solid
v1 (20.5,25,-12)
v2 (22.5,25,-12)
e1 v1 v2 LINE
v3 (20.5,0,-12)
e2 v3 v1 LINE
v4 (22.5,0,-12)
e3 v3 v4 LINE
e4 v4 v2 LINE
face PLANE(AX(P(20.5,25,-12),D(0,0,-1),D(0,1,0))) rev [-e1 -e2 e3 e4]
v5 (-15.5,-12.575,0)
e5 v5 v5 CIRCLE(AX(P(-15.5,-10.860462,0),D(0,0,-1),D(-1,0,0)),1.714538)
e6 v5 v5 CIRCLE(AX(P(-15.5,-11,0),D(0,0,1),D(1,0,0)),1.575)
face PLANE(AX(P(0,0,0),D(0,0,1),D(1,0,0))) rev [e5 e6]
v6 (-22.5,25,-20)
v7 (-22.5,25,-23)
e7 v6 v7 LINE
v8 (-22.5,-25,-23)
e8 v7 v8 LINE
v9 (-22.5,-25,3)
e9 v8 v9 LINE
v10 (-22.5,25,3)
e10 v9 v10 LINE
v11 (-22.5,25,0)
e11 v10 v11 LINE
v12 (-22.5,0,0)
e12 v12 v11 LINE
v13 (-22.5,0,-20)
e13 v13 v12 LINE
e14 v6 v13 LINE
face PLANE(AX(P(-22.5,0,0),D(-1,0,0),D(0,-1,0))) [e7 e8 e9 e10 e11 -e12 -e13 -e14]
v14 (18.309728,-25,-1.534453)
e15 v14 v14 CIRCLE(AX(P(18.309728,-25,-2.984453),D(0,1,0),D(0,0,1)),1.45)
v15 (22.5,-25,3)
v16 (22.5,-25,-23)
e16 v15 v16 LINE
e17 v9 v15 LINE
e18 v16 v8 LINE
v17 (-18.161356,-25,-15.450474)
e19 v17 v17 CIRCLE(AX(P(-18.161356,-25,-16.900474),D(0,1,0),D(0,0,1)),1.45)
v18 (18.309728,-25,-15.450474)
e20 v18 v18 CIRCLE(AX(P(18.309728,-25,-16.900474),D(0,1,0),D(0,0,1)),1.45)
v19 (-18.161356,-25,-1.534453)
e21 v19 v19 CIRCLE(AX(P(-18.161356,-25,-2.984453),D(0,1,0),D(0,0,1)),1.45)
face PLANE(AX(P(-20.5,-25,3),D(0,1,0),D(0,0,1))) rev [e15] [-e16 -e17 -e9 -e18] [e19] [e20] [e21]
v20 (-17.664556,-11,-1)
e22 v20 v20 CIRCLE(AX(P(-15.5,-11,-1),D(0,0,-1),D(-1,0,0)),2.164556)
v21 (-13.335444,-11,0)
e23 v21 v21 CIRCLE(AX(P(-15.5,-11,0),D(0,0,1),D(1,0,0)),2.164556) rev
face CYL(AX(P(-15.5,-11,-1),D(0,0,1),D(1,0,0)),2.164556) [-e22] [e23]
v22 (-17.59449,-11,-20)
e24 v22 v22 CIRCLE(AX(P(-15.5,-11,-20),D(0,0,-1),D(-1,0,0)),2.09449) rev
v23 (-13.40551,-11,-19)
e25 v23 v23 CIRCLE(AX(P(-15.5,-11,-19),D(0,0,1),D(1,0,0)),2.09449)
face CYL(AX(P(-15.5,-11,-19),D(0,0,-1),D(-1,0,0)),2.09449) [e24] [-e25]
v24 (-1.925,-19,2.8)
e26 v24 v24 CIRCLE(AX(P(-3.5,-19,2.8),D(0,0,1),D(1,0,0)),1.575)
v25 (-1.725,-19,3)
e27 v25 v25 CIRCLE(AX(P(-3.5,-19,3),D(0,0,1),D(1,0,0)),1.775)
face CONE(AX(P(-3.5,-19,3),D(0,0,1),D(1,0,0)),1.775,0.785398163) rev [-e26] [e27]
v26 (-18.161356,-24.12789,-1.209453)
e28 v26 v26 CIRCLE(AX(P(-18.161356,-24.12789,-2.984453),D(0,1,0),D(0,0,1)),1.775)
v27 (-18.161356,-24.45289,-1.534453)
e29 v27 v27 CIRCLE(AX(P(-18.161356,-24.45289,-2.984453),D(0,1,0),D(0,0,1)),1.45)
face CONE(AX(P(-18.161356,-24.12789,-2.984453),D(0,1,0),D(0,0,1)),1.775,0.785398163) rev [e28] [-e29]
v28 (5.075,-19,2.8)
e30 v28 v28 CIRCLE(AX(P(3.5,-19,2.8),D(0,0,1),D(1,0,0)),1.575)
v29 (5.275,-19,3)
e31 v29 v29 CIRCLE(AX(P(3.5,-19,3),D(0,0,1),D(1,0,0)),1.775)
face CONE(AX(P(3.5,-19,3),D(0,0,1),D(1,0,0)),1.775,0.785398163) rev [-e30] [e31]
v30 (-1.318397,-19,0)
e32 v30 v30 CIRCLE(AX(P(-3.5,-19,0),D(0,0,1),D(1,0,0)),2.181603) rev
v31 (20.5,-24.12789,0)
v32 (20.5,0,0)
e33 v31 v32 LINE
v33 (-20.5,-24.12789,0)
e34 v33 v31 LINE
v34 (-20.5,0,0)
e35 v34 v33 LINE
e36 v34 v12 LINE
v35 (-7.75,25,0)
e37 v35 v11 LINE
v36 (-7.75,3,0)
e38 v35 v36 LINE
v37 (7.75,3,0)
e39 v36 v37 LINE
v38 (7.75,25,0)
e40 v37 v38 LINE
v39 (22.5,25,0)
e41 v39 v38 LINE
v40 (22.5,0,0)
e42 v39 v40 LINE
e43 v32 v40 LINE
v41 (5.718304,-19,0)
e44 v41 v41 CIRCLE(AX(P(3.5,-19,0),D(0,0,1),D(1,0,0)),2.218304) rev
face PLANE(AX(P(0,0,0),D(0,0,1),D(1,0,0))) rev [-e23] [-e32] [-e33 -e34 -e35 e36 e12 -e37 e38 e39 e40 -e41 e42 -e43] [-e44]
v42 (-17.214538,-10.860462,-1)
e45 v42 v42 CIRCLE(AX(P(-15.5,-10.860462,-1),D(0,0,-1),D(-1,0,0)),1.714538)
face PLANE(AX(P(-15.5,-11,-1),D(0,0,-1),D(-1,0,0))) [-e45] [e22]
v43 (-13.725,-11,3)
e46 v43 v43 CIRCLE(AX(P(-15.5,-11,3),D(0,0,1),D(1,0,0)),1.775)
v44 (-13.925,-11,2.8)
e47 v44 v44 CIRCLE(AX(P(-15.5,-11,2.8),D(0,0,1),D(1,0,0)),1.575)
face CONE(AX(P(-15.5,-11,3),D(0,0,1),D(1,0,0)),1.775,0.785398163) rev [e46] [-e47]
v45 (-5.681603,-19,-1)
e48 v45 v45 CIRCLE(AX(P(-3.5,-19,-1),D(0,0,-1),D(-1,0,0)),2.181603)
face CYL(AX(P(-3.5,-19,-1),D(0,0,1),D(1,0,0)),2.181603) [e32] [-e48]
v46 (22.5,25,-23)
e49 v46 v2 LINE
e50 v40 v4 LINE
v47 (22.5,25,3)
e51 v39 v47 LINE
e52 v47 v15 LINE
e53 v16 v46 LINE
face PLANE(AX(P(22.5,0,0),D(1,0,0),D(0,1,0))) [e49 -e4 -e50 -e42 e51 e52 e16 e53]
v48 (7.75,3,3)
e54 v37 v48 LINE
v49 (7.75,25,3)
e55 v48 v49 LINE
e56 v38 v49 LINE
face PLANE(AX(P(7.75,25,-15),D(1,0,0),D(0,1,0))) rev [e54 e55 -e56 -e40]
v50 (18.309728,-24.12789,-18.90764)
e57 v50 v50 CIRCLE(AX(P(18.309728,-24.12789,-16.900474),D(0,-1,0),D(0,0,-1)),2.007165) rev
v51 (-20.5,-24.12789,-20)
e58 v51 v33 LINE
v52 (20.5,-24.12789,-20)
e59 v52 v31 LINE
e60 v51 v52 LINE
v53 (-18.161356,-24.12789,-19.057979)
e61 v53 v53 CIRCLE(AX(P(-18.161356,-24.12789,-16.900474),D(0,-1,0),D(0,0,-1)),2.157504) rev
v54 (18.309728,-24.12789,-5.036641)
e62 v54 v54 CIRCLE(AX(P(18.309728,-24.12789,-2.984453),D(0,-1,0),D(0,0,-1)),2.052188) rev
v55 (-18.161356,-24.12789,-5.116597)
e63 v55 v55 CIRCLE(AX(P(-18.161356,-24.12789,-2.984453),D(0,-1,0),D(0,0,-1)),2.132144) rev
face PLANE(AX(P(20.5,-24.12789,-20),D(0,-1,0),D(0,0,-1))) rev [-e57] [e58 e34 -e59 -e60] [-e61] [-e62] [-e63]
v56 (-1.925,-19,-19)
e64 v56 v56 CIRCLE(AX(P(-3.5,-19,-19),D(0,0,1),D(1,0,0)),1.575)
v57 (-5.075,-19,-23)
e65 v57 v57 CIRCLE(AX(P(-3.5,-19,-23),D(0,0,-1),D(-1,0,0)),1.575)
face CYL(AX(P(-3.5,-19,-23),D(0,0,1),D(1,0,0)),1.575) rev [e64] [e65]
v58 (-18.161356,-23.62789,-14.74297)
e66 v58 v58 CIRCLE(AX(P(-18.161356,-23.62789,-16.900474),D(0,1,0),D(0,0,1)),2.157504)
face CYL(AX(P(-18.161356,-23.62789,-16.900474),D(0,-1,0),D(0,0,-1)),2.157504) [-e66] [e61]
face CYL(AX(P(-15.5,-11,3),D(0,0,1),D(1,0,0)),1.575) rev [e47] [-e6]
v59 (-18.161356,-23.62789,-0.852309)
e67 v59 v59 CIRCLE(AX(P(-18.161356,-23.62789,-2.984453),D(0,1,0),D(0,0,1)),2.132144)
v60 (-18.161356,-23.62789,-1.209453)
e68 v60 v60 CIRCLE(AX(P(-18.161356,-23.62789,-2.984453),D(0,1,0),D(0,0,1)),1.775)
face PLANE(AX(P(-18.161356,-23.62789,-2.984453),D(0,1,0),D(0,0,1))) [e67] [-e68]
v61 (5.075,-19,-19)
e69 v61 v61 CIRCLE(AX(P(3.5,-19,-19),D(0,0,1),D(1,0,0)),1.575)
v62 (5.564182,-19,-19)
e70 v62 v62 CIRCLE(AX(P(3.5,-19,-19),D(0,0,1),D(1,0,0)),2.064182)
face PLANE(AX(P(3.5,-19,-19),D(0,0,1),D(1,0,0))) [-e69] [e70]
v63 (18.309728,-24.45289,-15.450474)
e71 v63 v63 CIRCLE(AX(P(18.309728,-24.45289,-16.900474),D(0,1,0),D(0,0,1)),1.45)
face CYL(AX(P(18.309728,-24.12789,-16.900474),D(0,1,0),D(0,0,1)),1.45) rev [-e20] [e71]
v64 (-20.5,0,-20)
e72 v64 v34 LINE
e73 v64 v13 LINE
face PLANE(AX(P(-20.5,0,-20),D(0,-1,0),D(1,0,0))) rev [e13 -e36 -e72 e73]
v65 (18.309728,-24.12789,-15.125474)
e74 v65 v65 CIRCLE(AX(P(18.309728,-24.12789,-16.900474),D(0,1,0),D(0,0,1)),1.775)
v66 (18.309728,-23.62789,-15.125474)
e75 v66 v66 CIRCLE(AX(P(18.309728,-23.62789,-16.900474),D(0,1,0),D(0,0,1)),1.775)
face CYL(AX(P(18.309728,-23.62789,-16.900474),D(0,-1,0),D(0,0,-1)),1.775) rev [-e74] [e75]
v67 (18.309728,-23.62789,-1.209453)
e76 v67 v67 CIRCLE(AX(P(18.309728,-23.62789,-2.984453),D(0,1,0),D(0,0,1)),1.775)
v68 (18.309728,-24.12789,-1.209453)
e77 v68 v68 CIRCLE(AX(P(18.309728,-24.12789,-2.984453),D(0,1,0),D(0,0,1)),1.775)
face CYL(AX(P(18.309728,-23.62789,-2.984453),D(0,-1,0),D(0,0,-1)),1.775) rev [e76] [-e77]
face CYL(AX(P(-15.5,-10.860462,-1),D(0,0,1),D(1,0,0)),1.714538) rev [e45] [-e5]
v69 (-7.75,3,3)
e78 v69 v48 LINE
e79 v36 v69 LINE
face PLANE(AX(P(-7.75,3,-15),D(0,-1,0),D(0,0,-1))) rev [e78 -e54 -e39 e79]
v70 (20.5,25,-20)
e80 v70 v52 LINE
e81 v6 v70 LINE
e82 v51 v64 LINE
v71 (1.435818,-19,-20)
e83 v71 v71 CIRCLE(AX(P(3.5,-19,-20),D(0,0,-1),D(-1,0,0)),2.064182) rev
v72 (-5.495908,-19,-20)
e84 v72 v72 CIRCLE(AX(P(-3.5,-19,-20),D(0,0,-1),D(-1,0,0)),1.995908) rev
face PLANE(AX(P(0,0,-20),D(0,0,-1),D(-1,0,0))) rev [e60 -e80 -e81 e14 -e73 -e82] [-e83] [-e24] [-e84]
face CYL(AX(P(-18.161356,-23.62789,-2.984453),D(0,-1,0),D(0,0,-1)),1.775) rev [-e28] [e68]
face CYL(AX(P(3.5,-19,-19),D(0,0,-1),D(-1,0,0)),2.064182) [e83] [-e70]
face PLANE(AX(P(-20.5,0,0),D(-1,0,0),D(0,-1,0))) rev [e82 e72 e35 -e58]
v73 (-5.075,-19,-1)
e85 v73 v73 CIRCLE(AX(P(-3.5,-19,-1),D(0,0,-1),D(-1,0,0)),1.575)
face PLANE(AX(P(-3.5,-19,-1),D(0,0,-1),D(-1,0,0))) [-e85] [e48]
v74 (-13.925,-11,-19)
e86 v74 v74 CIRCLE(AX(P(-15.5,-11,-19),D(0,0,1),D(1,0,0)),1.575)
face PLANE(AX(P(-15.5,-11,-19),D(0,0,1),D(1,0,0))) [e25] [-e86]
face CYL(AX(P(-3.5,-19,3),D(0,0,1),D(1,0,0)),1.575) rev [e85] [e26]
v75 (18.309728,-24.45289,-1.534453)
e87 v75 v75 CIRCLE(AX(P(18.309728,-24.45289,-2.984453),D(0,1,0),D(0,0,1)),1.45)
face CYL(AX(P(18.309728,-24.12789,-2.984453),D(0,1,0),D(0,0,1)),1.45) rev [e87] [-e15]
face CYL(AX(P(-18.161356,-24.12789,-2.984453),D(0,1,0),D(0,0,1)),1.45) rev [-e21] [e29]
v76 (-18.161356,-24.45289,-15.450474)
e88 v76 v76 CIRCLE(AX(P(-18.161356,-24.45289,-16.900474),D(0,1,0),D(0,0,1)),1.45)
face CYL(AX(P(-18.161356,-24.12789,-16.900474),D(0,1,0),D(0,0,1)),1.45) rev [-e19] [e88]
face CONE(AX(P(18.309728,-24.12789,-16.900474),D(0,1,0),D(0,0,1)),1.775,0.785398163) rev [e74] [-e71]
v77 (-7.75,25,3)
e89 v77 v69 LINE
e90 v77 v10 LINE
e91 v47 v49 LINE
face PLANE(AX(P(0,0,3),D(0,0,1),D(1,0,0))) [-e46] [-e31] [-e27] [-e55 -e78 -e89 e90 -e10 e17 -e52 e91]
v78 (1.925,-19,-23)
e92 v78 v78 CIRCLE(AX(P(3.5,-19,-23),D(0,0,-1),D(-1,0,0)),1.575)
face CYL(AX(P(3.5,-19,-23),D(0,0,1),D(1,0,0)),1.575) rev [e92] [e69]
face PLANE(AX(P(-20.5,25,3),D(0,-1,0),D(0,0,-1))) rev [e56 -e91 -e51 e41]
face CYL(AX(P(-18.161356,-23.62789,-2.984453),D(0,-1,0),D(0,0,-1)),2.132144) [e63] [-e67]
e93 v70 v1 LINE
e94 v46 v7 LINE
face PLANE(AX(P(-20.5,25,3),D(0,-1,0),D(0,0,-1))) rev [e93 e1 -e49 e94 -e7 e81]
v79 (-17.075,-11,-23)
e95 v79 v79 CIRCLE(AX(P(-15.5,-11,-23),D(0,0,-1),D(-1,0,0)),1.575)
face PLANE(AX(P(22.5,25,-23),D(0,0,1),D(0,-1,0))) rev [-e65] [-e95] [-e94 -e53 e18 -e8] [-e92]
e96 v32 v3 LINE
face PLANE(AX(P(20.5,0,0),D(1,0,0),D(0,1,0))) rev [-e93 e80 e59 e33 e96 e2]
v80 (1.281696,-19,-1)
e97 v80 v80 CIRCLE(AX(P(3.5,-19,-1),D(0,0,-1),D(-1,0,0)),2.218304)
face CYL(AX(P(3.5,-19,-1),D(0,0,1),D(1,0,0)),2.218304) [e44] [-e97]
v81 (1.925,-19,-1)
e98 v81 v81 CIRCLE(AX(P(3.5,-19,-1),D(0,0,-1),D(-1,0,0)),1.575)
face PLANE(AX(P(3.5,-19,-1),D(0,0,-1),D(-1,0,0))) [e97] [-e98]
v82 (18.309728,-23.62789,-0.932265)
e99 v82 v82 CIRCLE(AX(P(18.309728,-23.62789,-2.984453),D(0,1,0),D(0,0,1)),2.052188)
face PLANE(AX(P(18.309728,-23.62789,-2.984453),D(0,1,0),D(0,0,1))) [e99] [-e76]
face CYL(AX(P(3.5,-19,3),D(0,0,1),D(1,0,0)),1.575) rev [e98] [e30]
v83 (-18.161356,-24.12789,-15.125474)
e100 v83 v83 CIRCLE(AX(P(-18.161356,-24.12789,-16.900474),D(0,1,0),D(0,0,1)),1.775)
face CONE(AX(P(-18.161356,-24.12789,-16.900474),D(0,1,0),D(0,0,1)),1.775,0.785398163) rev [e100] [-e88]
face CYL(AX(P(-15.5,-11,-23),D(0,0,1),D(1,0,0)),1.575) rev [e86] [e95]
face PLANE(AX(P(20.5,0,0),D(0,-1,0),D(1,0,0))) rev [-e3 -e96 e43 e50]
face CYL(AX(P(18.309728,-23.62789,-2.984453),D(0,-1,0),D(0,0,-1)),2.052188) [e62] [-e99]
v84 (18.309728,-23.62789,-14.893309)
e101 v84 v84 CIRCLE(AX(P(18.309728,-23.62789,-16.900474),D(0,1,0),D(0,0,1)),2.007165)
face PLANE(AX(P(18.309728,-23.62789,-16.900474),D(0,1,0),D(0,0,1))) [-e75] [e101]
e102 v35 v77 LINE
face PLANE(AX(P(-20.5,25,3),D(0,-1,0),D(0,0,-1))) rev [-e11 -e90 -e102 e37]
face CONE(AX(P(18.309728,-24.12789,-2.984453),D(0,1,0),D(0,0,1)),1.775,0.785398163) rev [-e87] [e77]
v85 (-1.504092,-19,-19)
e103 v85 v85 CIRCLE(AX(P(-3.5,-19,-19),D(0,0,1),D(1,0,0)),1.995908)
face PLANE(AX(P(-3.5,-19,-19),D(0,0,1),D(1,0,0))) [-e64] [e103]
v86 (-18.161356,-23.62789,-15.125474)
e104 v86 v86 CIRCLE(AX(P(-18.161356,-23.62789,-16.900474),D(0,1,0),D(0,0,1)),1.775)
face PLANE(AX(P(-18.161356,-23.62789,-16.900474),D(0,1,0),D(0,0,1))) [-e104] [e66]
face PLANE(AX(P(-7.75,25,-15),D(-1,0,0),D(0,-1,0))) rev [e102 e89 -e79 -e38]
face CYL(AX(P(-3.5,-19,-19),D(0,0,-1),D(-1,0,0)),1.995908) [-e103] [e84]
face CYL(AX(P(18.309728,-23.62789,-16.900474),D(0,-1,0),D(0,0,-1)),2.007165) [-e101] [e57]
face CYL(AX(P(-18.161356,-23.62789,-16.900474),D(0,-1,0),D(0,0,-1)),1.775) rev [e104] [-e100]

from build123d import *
from build123d.topology import SkipClean

# Parameters (mm, degrees)
SKETCH_1_W                     = 41
SKETCH_1_H                     = 50
EXTRUDE_1_DEPTH                = 3
SKETCH_3_W                     = 15.5
SKETCH_3_H                     = 22
CUT_EXTRUDE_1_DEPTH            = 18
HOLE_WIZARD_M3_5_1_D           = 3.15
HOLE_WIZARD_M3_5_1_CSINK_D     = 3.55
HOLE_WIZARD_M3_5_1_CSINK_ANGLE = 90
SKETCH_16_W                    = 41
SKETCH_16_H                    = 0.872109694
EXTRUDE_5_DEPTH                = 20
SKETCH_17_W                    = 41
SKETCH_17_H                    = 50
SKETCH_17_R                    = 1.575
EXTRUDE_6_DEPTH                = 3
SKETCH_20_W                    = 26
SKETCH_20_H                    = 50
EXTRUDE_8_DEPTH                = 2
SKETCH_21_W                    = 12
SKETCH_21_H                    = 25
CUT_EXTRUDE_2_DEPTH            = 2
SKETCH_22_W                    = 26
SKETCH_22_H                    = 50
EXTRUDE_9_DEPTH                = 2
SKETCH_27_W                    = 20
SKETCH_27_H                    = 25
CUT_EXTRUDE_3_DEPTH            = 2
HOLE_WIZARD_M3_5_2_D           = 2.9
HOLE_WIZARD_M3_5_2_DEPTH       = 10
HOLE_WIZARD_M3_5_2_CSINK_D     = 3.55
HOLE_WIZARD_M3_5_2_CSINK_ANGLE = 90
HOLE_WIZARD_M3_5_2_TIP         = 0.871247898
SKETCH_36_R                    = 2.218303603
SKETCH_36_R_2                  = 1.575
SKETCH_36_R_3                  = 2.18160311
SKETCH_36_R_4                  = 2.164555566
SKETCH_36_R_5                  = 1.714538104
EXTRUDE_10_DEPTH               = 1
EXTRUDE_START                  = 1
SKETCH_37_R                    = 2.094490393
SKETCH_37_R_2                  = 1.575
SKETCH_37_R_3                  = 1.99590809
SKETCH_37_R_4                  = 2.064181582
EXTRUDE_11_DEPTH               = 1
SKETCH_38_R                    = 2.007165216
SKETCH_38_R_2                  = 1.775
SKETCH_38_R_3                  = 2.052187766
SKETCH_38_R_4                  = 2.157504148
SKETCH_38_R_5                  = 2.13214376
EXTRUDE_12_DEPTH               = 0.5


with BuildPart() as part:
    # 스케치1 → 보스-돌출1 (new body)
    with BuildSketch(Plane.XY):
        Rectangle(SKETCH_1_W, SKETCH_1_H)
    extrude(amount=EXTRUDE_1_DEPTH)

    # 스케치3 → 컷-돌출1 (cut)
    with BuildSketch(Plane.XY.offset(3)):
        with Locations((0, 14)):
            Rectangle(SKETCH_3_W, SKETCH_3_H)
    extrude(amount=-CUT_EXTRUDE_1_DEPTH, mode=Mode.SUBTRACT)

    # M3.5 나사 구멍1 (through all)
    with Locations(Plane.XY.offset(3)):
        with Locations((-3.5, -19), (3.5, -19), (-15.5, -11)):
            CounterSinkHole(HOLE_WIZARD_M3_5_1_D / 2, HOLE_WIZARD_M3_5_1_CSINK_D / 2, counter_sink_angle=HOLE_WIZARD_M3_5_1_CSINK_ANGLE)

    # 스케치16 → 보스-돌출5 (add)
    with BuildSketch(Plane(origin=(0, 0, 0), x_dir=(-1, 0, 0), z_dir=(0, 0, -1))):
        with Locations((0, -24.563945153)):
            Rectangle(SKETCH_16_W, SKETCH_16_H)
    extrude(amount=EXTRUDE_5_DEPTH)



with BuildPart() as body_2:
    # 스케치17 → 보스-돌출6 (new body)
    with BuildSketch(Plane(origin=(0, 0, -20), x_dir=(-1, 0, 0), z_dir=(0, 0, -1))):
        Rectangle(SKETCH_17_W, SKETCH_17_H)
        with Locations(Location((15.5, -11, 0), (0, 0, 180))):
            Circle(SKETCH_17_R, mode=Mode.SUBTRACT)
        with Locations(Location((3.5, -19, 0), (0, 0, 180))):
            Circle(SKETCH_17_R, mode=Mode.SUBTRACT)
        with Locations(Location((-3.5, -19, 0), (0, 0, 180))):
            Circle(SKETCH_17_R, mode=Mode.SUBTRACT)
    extrude(amount=EXTRUDE_6_DEPTH)


with BuildPart() as part_1:
    add(part.part)

    add(body_2.part)  # 보스-돌출8 merges body 2
    # 스케치20 → 보스-돌출8 (add)
    with BuildSketch(Plane(origin=(20.5, 0, 0), x_dir=(0, 0, -1), z_dir=(1, 0, 0))):
        with Locations((10, 0)):
            Rectangle(SKETCH_20_W, SKETCH_20_H)
    extrude(amount=EXTRUDE_8_DEPTH)

    # 스케치21 → 컷-돌출2 (cut)
    with BuildSketch(Plane(origin=(22.5, 0, 0), x_dir=(0, 0, -1), z_dir=(1, 0, 0))):
        with Locations((6, 12.5)):
            Rectangle(SKETCH_21_W, SKETCH_21_H)
    extrude(amount=-CUT_EXTRUDE_2_DEPTH, mode=Mode.SUBTRACT)

    # 스케치22 → 보스-돌출9 (add)
    with BuildSketch(Plane.ZY.offset(20.5)):
        with Locations((-10, 0)):
            Rectangle(SKETCH_22_W, SKETCH_22_H)
    extrude(amount=EXTRUDE_9_DEPTH)

    # 스케치27 → 컷-돌출3 (cut)
    with BuildSketch(Plane.ZY.offset(22.5)):
        with Locations((-10, 12.5)):
            Rectangle(SKETCH_27_W, SKETCH_27_H)
    extrude(amount=-CUT_EXTRUDE_3_DEPTH, mode=Mode.SUBTRACT)

    # M3.5 나사 구멍2
    with Locations(Plane(origin=(0, -24.127890306, 0), x_dir=(1, 0, 0), z_dir=(0, 1, 0))):
        with Locations((-18.161355758, 16.900474402), (18.309727807, 16.900474402), (-18.161355758, 2.984453016), (18.309727807, 2.984453016)):
            CounterSinkHole(HOLE_WIZARD_M3_5_2_D / 2, HOLE_WIZARD_M3_5_2_CSINK_D / 2, depth=HOLE_WIZARD_M3_5_2_DEPTH, counter_sink_angle=HOLE_WIZARD_M3_5_2_CSINK_ANGLE)
            with Locations((0, 0, -(HOLE_WIZARD_M3_5_2_DEPTH + HOLE_WIZARD_M3_5_2_TIP / 2))):  # 118° drill point
                Cone(0, HOLE_WIZARD_M3_5_2_D / 2, HOLE_WIZARD_M3_5_2_TIP, mode=Mode.SUBTRACT)

    # 스케치36 → 보스-돌출10 (add)
    # profile 1 of 3: a face of its own
    with SkipClean():  # the faces are left unmerged after this step: merging them gives an invalid solid
        with BuildSketch(Plane(origin=(0, 0, 0), x_dir=(-1, 0, 0), z_dir=(0, 0, -1))):
            with Locations(Location((-3.5, -19, 0), (0, 0, 180))):
                Circle(SKETCH_36_R)
            with Locations(Location((-3.5, -19, 0), (0, 0, 180))):
                Circle(SKETCH_36_R_2, mode=Mode.SUBTRACT)
        # profile 2 of 3: a face of its own
        with BuildSketch(Plane(origin=(0, 0, 0), x_dir=(-1, 0, 0), z_dir=(0, 0, -1))):
            with Locations(Location((3.5, -19, 0), (0, 0, 180))):
                Circle(SKETCH_36_R_3)
            with Locations(Location((3.5, -19, 0), (0, 0, 180))):
                Circle(SKETCH_36_R_2, mode=Mode.SUBTRACT)
        # profile 3 of 3: a face of its own
        with BuildSketch(Plane(origin=(0, 0, 0), x_dir=(-1, 0, 0), z_dir=(0, 0, -1))):
            with Locations(Location((15.5, -11, 0), (0, 0, 180))):
                Circle(SKETCH_36_R_4)
            with Locations(Location((15.5, -10.860461896, 0), (0, 0, 270))):
                Circle(SKETCH_36_R_5, mode=Mode.SUBTRACT)
        extrude(amount=EXTRUDE_10_DEPTH)
    add(part_1.part.scale(1), mode=Mode.REPLACE)  # the faces are merged on a copy

    # 스케치37 → 보스-돌출11 (add)
    # profile 1 of 3: a face of its own
    with BuildSketch(Plane.XY.offset(-20).offset(EXTRUDE_START)):
        with Locations(Location((-15.5, -11, 0), (0, 0, 180))):
            Circle(SKETCH_37_R)
        with Locations((-15.5, -11)):
            Circle(SKETCH_37_R_2, mode=Mode.SUBTRACT)
    # profile 2 of 3: a face of its own
    with BuildSketch(Plane.XY.offset(-20).offset(EXTRUDE_START)):
        with Locations(Location((-3.5, -19, 0), (0, 0, 180))):
            Circle(SKETCH_37_R_3)
        with Locations((-3.5, -19)):
            Circle(SKETCH_37_R_2, mode=Mode.SUBTRACT)
    # profile 3 of 3: a face of its own
    with BuildSketch(Plane.XY.offset(-20).offset(EXTRUDE_START)):
        with Locations(Location((3.5, -19, 0), (0, 0, 180))):
            Circle(SKETCH_37_R_4)
        with Locations((3.5, -19)):
            Circle(SKETCH_37_R_2, mode=Mode.SUBTRACT)
    extrude(amount=-EXTRUDE_11_DEPTH)

    # 스케치38 → 보스-돌출12 (add)
    # profile 1 of 4: a face of its own
    with BuildSketch(Plane(origin=(0, -24.127890306, 0), x_dir=(1, 0, 0), z_dir=(0, 1, 0))):
        with Locations(Location((18.309727807, 16.900474402, 0), (0, 0, 90))):
            Circle(SKETCH_38_R)
        with Locations(Location((18.309727807, 16.900474402, 0), (0, 0, 270))):
            Circle(SKETCH_38_R_2, mode=Mode.SUBTRACT)
    # profile 2 of 4: a face of its own
    with BuildSketch(Plane(origin=(0, -24.127890306, 0), x_dir=(1, 0, 0), z_dir=(0, 1, 0))):
        with Locations(Location((18.309727807, 2.984453016, 0), (0, 0, 90))):
            Circle(SKETCH_38_R_3)
        with Locations(Location((18.309727807, 2.984453016, 0), (0, 0, 270))):
            Circle(SKETCH_38_R_2, mode=Mode.SUBTRACT)
    # profile 3 of 4: a face of its own
    with BuildSketch(Plane(origin=(0, -24.127890306, 0), x_dir=(1, 0, 0), z_dir=(0, 1, 0))):
        with Locations(Location((-18.161355758, 16.900474402, 0), (0, 0, 90))):
            Circle(SKETCH_38_R_4)
        with Locations(Location((-18.161355758, 16.900474402, 0), (0, 0, 270))):
            Circle(SKETCH_38_R_2, mode=Mode.SUBTRACT)
    # profile 4 of 4: a face of its own
    with BuildSketch(Plane(origin=(0, -24.127890306, 0), x_dir=(1, 0, 0), z_dir=(0, 1, 0))):
        with Locations(Location((-18.161355758, 2.984453016, 0), (0, 0, 90))):
            Circle(SKETCH_38_R_5)
        with Locations(Location((-18.161355758, 2.984453016, 0), (0, 0, 270))):
            Circle(SKETCH_38_R_2, mode=Mode.SUBTRACT)
    extrude(amount=EXTRUDE_12_DEPTH)


solid = part_1.part
